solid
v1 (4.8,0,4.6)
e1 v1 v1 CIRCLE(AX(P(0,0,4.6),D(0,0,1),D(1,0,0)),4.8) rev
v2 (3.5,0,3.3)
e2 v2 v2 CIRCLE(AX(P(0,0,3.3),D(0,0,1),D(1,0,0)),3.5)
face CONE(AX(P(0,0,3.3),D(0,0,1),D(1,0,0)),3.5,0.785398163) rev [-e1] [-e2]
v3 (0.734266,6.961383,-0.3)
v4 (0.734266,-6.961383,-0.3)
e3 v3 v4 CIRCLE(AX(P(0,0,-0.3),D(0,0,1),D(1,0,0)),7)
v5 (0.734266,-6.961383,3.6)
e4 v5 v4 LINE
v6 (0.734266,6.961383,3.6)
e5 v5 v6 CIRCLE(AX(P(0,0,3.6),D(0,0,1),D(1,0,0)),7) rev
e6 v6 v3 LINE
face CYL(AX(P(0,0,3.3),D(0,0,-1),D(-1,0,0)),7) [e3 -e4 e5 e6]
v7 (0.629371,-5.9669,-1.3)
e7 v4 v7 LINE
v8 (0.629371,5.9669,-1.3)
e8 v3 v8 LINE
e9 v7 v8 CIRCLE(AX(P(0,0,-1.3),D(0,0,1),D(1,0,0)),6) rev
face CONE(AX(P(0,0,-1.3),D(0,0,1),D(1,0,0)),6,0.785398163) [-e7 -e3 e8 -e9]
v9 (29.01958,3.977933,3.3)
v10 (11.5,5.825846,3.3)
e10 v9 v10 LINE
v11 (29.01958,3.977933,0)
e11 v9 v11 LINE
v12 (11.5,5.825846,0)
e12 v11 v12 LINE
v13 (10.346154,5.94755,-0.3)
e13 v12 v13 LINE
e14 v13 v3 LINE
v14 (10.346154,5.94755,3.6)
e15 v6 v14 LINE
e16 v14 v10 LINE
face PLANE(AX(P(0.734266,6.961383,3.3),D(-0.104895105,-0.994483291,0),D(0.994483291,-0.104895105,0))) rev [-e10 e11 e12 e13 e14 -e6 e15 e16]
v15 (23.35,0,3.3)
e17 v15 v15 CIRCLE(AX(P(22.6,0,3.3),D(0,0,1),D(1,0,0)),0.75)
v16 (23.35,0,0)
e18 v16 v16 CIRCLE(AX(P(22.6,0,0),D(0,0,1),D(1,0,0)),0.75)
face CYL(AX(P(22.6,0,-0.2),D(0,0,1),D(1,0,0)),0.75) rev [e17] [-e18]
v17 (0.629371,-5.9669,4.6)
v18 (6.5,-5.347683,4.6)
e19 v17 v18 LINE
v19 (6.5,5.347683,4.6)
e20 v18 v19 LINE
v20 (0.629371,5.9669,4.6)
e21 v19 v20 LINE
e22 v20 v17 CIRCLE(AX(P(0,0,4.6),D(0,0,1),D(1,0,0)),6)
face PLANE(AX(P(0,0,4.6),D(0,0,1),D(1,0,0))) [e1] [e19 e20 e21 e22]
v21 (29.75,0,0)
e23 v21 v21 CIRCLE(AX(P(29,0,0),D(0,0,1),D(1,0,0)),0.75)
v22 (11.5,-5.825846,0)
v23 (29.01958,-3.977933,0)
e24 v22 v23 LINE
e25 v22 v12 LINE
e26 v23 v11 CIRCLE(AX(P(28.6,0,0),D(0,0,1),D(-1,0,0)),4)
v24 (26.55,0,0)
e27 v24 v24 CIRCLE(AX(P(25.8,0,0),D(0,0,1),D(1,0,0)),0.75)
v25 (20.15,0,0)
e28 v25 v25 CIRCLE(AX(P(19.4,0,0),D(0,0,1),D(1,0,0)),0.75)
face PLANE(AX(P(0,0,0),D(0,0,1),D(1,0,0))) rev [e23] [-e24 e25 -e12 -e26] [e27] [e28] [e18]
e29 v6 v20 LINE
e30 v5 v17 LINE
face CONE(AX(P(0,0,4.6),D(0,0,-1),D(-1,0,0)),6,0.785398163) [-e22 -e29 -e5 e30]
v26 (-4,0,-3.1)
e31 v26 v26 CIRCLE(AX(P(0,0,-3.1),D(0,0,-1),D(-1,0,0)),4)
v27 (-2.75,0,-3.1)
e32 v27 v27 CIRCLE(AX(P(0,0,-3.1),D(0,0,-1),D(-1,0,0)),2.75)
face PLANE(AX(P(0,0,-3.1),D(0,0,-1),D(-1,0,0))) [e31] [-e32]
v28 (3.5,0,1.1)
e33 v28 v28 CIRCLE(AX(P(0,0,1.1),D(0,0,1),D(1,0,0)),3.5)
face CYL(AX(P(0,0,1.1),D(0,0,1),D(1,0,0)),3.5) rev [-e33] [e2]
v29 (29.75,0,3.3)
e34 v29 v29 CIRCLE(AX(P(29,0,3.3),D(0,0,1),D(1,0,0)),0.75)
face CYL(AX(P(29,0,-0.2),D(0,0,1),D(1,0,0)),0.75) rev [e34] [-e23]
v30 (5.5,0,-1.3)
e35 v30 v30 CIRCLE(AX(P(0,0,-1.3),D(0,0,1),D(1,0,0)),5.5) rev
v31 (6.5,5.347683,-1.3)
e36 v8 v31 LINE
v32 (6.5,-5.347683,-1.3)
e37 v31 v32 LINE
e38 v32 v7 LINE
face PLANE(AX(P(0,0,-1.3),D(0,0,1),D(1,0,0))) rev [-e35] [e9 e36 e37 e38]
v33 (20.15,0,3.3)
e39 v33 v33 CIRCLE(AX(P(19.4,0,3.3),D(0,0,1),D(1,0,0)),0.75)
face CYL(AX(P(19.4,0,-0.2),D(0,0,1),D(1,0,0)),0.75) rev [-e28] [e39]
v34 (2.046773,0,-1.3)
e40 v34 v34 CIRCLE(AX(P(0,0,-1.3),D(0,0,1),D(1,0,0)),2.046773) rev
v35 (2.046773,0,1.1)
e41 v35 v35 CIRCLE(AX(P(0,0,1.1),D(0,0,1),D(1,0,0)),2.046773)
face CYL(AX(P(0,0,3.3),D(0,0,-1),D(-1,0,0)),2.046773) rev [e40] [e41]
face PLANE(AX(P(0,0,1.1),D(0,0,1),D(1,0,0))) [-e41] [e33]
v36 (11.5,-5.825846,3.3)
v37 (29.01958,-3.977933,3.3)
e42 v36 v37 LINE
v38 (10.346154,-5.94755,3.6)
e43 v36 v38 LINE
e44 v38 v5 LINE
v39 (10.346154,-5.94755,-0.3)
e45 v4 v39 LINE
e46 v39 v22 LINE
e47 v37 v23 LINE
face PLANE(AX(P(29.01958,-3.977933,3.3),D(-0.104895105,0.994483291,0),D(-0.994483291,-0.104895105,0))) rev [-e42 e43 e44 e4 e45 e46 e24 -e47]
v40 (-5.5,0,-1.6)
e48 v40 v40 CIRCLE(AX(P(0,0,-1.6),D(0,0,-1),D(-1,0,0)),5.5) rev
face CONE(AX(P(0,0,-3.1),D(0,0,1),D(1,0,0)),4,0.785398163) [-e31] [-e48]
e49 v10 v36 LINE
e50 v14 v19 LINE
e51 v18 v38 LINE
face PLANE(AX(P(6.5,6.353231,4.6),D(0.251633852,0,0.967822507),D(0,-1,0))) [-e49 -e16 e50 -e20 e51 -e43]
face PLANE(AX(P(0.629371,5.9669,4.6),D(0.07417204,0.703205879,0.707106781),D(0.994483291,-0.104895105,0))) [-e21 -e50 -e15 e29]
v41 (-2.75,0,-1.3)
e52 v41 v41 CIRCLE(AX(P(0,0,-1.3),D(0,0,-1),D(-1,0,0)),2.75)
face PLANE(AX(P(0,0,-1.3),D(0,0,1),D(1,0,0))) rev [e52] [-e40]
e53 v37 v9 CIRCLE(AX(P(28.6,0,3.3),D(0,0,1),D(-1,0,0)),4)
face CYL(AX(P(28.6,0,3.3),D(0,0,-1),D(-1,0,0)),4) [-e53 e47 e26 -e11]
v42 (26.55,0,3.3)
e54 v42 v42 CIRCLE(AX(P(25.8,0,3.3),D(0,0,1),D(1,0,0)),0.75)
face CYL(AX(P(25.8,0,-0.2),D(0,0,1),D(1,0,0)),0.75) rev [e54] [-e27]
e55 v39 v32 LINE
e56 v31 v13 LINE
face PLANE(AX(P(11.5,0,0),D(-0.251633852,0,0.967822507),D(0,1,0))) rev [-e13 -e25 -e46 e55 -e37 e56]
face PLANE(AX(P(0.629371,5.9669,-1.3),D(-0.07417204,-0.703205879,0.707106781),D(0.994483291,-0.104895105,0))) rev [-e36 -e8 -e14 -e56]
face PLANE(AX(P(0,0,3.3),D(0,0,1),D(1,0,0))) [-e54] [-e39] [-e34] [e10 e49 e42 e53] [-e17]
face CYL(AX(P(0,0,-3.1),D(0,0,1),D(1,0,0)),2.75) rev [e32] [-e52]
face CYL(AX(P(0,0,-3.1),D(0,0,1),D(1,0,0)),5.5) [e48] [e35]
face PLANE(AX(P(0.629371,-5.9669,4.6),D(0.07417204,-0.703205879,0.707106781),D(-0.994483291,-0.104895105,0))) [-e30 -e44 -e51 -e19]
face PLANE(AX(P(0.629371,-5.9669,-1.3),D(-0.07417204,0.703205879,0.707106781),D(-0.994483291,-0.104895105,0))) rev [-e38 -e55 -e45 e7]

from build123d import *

# Parameters (mm, degrees)
ESQUISSE1_R             = 2.046773471
BOSS_EXTRU_1_DEPTH      = 3.3
BOSS_EXTRU_2_DEPTH      = 1.3
BOSS_EXTRU_2_DEPTH_BACK = 4.6
ESQUISSE2_R             = 2.046773471
CHANFREIN1_SIZE         = 5
CHANFREIN1_SIZE_2       = 1.3
CHANFREIN3_SIZE         = 5
CHANFREIN3_SIZE_2       = 1.3
CHANFREIN2_SIZE         = 1
ESQUISSE3_R             = 5.5
ESQUISSE3_R_2           = 2.75
BOSS_EXTRU_3_DEPTH      = 1.8
CHANFREIN4_SIZE         = 1.5
ESQUISSE4_R             = 3.5
ENL_V_MAT_EXTRU_1_DEPTH = 3.5
CHANFREIN5_SIZE         = 1.3
ESQUISSE5_R             = 0.75
ENL_V_MAT_EXTRU_2_DEPTH = 3.5


with BuildPart() as part:
    # Esquisse1 → Boss.-Extru.1 (new body)
    with BuildSketch(Plane.XY):
        with BuildLine():
            Line((0.734265734, 6.96138304), (29.01958042, 3.977933166))
            ThreePointArc((29.01958042, 3.977933166), (32.6, 0), (29.01958042, -3.977933166))
            Line((29.01958042, -3.977933166), (0.734265734, -6.96138304))
            ThreePointArc((0.734265734, -6.96138304), (-7, 0), (0.734265734, 6.96138304))
        make_face()
        Circle(ESQUISSE1_R, mode=Mode.SUBTRACT)
    extrude(amount=BOSS_EXTRU_1_DEPTH)

    # Esquisse2 → Boss.-Extru.2 (add, two sides: drawn at the far end of the back side and taken through both)
    with BuildSketch(Plane.XY.offset(3.3).offset(-BOSS_EXTRU_2_DEPTH_BACK)):
        with BuildLine():
            Line((0.734265734, 6.96138304), (6.5, 6.353230741))
            Line((6.5, 6.353230741), (6.5, -6.353230741))
            Line((6.5, -6.353230741), (0.734265734, -6.96138304))
            ThreePointArc((0.734265734, -6.96138304), (-7, 0), (0.734265734, 6.96138304))
        make_face()
        Circle(ESQUISSE2_R, mode=Mode.SUBTRACT)
    extrude(amount=BOSS_EXTRU_2_DEPTH + BOSS_EXTRU_2_DEPTH_BACK)

    # Chanfrein1
    # the kernel refuses this chamfer: 5, 1.3 mm, written as the material it adds along each edge
    with BuildSketch(Plane(origin=(6.5, 19.337751576, 3.3), x_dir=(0.9999530531472482, 0, -0.009689762716214913), z_dir=(0, -1, 0))) as chanfrein1_piece_1_section:
        Polygon((CHANFREIN1_SIZE * 0.999953053147, CHANFREIN1_SIZE * 0.00968976271621), (-CHANFREIN1_SIZE_2 * 0.00968976271621, CHANFREIN1_SIZE_2 * 0.999953053147), (0, 0), align=None)
    chanfrein1_piece_1 = extrude(amount=38.675503153, mode=Mode.PRIVATE)
    chanfrein1_piece_1 = split(chanfrein1_piece_1, bisect_by=Plane(origin=(8.862365218, 6.104055566, 3.683257133), z_dir=(-0.10489510489510492, -0.994483291447898, 0)), keep=Keep.TOP, mode=Mode.PRIVATE)
    chanfrein1_piece_1 = split(chanfrein1_piece_1, bisect_by=Plane(origin=(8.862365218, -6.104055566, 3.683257133), z_dir=(-0.10489510489510483, 0.9944832914478982, 0)), keep=Keep.TOP, mode=Mode.PRIVATE)
    chanfrein1_piece_1 = split(chanfrein1_piece_1, bisect_by=Plane(origin=(8.218527805, 0, 4.6), z_dir=(0, 0, -1)), keep=Keep.TOP, mode=Mode.PRIVATE)
    add(chanfrein1_piece_1)

    # Chanfrein3
    # the kernel refuses this chamfer: 5, 1.3 mm, written as the material it adds along each edge
    with BuildSketch(Plane(origin=(6.5, 19.337751576, 0), x_dir=(0.9999530531472482, 0, 0.009689762716214958), z_dir=(0, -1, 0))) as chanfrein3_piece_1_section:
        Polygon((CHANFREIN3_SIZE * 0.999953053147, -CHANFREIN3_SIZE * 0.00968976271621), (-CHANFREIN3_SIZE_2 * 0.00968976271621, -CHANFREIN3_SIZE_2 * 0.999953053147), (0, 0), align=None)
    chanfrein3_piece_1 = extrude(amount=38.675503153, mode=Mode.PRIVATE)
    chanfrein3_piece_1 = split(chanfrein3_piece_1, bisect_by=Plane(origin=(8.862365218, 6.104055566, -0.383257133), z_dir=(-0.10489510489499053, -0.9944832914479101, 0)), keep=Keep.TOP, mode=Mode.PRIVATE)
    chanfrein3_piece_1 = split(chanfrein3_piece_1, bisect_by=Plane(origin=(8.862365218, -6.104055566, -0.383257133), z_dir=(-0.10489510489499053, 0.9944832914479101, 0)), keep=Keep.TOP, mode=Mode.PRIVATE)
    chanfrein3_piece_1 = split(chanfrein3_piece_1, bisect_by=Plane(origin=(8.218527805, 0, -1.3), z_dir=(0, 0, 1)), keep=Keep.TOP, mode=Mode.PRIVATE)
    add(chanfrein3_piece_1)

    # Chanfrein2
    chanfrein2_edges = [part.edges().sort_by_distance(p)[0] for p in [
        (-7, 0, -1.3),
        (3.617132867, 6.65730689, -1.3),
        (3.617132867, -6.65730689, -1.3),
        (-7, 0, 4.6),
        (3.617132867, -6.65730689, 4.6),
        (3.617132867, 6.65730689, 4.6),
    ]]
    chamfer(chanfrein2_edges, length=CHANFREIN2_SIZE)

    # Esquisse3 → Boss.-Extru.3 (add)
    with BuildSketch(Plane(origin=(0, 0, -1.3), x_dir=(-1, 0, 0), z_dir=(0, 0, -1))):
        with Locations(Location((0, 0, 0), (0, 0, 180))):
            Circle(ESQUISSE3_R)
        Circle(ESQUISSE3_R_2, mode=Mode.SUBTRACT)
    extrude(amount=BOSS_EXTRU_3_DEPTH)

    # Chanfrein4
    chanfrein4_edges = [part.edges().sort_by_distance(p)[0] for p in [
        (-5.5, 0, -3.1),
    ]]
    chamfer(chanfrein4_edges, length=CHANFREIN4_SIZE)

    # Esquisse4 → Enlèv. mat.-Extru.1 (cut)
    with BuildSketch(Plane.XY.offset(4.6)):
        Circle(ESQUISSE4_R)
    extrude(amount=-ENL_V_MAT_EXTRU_1_DEPTH, mode=Mode.SUBTRACT)

    # Chanfrein5
    chanfrein5_edges = [part.edges().sort_by_distance(p)[0] for p in [
        (-3.5, 0, 4.6),
    ]]
    chamfer(chanfrein5_edges, length=CHANFREIN5_SIZE)

    # Esquisse5 → Enlèv. mat.-Extru.2 (cut)
    with BuildSketch(Plane.XY.offset(3.3)):
        with Locations((29, 0)):
            Circle(ESQUISSE5_R)
        with Locations((25.8, 0)):
            Circle(ESQUISSE5_R)
        with Locations((22.6, 0)):
            Circle(ESQUISSE5_R)
        with Locations((19.4, 0)):
            Circle(ESQUISSE5_R)
    extrude(amount=-ENL_V_MAT_EXTRU_2_DEPTH, mode=Mode.SUBTRACT)


solid = part.part
